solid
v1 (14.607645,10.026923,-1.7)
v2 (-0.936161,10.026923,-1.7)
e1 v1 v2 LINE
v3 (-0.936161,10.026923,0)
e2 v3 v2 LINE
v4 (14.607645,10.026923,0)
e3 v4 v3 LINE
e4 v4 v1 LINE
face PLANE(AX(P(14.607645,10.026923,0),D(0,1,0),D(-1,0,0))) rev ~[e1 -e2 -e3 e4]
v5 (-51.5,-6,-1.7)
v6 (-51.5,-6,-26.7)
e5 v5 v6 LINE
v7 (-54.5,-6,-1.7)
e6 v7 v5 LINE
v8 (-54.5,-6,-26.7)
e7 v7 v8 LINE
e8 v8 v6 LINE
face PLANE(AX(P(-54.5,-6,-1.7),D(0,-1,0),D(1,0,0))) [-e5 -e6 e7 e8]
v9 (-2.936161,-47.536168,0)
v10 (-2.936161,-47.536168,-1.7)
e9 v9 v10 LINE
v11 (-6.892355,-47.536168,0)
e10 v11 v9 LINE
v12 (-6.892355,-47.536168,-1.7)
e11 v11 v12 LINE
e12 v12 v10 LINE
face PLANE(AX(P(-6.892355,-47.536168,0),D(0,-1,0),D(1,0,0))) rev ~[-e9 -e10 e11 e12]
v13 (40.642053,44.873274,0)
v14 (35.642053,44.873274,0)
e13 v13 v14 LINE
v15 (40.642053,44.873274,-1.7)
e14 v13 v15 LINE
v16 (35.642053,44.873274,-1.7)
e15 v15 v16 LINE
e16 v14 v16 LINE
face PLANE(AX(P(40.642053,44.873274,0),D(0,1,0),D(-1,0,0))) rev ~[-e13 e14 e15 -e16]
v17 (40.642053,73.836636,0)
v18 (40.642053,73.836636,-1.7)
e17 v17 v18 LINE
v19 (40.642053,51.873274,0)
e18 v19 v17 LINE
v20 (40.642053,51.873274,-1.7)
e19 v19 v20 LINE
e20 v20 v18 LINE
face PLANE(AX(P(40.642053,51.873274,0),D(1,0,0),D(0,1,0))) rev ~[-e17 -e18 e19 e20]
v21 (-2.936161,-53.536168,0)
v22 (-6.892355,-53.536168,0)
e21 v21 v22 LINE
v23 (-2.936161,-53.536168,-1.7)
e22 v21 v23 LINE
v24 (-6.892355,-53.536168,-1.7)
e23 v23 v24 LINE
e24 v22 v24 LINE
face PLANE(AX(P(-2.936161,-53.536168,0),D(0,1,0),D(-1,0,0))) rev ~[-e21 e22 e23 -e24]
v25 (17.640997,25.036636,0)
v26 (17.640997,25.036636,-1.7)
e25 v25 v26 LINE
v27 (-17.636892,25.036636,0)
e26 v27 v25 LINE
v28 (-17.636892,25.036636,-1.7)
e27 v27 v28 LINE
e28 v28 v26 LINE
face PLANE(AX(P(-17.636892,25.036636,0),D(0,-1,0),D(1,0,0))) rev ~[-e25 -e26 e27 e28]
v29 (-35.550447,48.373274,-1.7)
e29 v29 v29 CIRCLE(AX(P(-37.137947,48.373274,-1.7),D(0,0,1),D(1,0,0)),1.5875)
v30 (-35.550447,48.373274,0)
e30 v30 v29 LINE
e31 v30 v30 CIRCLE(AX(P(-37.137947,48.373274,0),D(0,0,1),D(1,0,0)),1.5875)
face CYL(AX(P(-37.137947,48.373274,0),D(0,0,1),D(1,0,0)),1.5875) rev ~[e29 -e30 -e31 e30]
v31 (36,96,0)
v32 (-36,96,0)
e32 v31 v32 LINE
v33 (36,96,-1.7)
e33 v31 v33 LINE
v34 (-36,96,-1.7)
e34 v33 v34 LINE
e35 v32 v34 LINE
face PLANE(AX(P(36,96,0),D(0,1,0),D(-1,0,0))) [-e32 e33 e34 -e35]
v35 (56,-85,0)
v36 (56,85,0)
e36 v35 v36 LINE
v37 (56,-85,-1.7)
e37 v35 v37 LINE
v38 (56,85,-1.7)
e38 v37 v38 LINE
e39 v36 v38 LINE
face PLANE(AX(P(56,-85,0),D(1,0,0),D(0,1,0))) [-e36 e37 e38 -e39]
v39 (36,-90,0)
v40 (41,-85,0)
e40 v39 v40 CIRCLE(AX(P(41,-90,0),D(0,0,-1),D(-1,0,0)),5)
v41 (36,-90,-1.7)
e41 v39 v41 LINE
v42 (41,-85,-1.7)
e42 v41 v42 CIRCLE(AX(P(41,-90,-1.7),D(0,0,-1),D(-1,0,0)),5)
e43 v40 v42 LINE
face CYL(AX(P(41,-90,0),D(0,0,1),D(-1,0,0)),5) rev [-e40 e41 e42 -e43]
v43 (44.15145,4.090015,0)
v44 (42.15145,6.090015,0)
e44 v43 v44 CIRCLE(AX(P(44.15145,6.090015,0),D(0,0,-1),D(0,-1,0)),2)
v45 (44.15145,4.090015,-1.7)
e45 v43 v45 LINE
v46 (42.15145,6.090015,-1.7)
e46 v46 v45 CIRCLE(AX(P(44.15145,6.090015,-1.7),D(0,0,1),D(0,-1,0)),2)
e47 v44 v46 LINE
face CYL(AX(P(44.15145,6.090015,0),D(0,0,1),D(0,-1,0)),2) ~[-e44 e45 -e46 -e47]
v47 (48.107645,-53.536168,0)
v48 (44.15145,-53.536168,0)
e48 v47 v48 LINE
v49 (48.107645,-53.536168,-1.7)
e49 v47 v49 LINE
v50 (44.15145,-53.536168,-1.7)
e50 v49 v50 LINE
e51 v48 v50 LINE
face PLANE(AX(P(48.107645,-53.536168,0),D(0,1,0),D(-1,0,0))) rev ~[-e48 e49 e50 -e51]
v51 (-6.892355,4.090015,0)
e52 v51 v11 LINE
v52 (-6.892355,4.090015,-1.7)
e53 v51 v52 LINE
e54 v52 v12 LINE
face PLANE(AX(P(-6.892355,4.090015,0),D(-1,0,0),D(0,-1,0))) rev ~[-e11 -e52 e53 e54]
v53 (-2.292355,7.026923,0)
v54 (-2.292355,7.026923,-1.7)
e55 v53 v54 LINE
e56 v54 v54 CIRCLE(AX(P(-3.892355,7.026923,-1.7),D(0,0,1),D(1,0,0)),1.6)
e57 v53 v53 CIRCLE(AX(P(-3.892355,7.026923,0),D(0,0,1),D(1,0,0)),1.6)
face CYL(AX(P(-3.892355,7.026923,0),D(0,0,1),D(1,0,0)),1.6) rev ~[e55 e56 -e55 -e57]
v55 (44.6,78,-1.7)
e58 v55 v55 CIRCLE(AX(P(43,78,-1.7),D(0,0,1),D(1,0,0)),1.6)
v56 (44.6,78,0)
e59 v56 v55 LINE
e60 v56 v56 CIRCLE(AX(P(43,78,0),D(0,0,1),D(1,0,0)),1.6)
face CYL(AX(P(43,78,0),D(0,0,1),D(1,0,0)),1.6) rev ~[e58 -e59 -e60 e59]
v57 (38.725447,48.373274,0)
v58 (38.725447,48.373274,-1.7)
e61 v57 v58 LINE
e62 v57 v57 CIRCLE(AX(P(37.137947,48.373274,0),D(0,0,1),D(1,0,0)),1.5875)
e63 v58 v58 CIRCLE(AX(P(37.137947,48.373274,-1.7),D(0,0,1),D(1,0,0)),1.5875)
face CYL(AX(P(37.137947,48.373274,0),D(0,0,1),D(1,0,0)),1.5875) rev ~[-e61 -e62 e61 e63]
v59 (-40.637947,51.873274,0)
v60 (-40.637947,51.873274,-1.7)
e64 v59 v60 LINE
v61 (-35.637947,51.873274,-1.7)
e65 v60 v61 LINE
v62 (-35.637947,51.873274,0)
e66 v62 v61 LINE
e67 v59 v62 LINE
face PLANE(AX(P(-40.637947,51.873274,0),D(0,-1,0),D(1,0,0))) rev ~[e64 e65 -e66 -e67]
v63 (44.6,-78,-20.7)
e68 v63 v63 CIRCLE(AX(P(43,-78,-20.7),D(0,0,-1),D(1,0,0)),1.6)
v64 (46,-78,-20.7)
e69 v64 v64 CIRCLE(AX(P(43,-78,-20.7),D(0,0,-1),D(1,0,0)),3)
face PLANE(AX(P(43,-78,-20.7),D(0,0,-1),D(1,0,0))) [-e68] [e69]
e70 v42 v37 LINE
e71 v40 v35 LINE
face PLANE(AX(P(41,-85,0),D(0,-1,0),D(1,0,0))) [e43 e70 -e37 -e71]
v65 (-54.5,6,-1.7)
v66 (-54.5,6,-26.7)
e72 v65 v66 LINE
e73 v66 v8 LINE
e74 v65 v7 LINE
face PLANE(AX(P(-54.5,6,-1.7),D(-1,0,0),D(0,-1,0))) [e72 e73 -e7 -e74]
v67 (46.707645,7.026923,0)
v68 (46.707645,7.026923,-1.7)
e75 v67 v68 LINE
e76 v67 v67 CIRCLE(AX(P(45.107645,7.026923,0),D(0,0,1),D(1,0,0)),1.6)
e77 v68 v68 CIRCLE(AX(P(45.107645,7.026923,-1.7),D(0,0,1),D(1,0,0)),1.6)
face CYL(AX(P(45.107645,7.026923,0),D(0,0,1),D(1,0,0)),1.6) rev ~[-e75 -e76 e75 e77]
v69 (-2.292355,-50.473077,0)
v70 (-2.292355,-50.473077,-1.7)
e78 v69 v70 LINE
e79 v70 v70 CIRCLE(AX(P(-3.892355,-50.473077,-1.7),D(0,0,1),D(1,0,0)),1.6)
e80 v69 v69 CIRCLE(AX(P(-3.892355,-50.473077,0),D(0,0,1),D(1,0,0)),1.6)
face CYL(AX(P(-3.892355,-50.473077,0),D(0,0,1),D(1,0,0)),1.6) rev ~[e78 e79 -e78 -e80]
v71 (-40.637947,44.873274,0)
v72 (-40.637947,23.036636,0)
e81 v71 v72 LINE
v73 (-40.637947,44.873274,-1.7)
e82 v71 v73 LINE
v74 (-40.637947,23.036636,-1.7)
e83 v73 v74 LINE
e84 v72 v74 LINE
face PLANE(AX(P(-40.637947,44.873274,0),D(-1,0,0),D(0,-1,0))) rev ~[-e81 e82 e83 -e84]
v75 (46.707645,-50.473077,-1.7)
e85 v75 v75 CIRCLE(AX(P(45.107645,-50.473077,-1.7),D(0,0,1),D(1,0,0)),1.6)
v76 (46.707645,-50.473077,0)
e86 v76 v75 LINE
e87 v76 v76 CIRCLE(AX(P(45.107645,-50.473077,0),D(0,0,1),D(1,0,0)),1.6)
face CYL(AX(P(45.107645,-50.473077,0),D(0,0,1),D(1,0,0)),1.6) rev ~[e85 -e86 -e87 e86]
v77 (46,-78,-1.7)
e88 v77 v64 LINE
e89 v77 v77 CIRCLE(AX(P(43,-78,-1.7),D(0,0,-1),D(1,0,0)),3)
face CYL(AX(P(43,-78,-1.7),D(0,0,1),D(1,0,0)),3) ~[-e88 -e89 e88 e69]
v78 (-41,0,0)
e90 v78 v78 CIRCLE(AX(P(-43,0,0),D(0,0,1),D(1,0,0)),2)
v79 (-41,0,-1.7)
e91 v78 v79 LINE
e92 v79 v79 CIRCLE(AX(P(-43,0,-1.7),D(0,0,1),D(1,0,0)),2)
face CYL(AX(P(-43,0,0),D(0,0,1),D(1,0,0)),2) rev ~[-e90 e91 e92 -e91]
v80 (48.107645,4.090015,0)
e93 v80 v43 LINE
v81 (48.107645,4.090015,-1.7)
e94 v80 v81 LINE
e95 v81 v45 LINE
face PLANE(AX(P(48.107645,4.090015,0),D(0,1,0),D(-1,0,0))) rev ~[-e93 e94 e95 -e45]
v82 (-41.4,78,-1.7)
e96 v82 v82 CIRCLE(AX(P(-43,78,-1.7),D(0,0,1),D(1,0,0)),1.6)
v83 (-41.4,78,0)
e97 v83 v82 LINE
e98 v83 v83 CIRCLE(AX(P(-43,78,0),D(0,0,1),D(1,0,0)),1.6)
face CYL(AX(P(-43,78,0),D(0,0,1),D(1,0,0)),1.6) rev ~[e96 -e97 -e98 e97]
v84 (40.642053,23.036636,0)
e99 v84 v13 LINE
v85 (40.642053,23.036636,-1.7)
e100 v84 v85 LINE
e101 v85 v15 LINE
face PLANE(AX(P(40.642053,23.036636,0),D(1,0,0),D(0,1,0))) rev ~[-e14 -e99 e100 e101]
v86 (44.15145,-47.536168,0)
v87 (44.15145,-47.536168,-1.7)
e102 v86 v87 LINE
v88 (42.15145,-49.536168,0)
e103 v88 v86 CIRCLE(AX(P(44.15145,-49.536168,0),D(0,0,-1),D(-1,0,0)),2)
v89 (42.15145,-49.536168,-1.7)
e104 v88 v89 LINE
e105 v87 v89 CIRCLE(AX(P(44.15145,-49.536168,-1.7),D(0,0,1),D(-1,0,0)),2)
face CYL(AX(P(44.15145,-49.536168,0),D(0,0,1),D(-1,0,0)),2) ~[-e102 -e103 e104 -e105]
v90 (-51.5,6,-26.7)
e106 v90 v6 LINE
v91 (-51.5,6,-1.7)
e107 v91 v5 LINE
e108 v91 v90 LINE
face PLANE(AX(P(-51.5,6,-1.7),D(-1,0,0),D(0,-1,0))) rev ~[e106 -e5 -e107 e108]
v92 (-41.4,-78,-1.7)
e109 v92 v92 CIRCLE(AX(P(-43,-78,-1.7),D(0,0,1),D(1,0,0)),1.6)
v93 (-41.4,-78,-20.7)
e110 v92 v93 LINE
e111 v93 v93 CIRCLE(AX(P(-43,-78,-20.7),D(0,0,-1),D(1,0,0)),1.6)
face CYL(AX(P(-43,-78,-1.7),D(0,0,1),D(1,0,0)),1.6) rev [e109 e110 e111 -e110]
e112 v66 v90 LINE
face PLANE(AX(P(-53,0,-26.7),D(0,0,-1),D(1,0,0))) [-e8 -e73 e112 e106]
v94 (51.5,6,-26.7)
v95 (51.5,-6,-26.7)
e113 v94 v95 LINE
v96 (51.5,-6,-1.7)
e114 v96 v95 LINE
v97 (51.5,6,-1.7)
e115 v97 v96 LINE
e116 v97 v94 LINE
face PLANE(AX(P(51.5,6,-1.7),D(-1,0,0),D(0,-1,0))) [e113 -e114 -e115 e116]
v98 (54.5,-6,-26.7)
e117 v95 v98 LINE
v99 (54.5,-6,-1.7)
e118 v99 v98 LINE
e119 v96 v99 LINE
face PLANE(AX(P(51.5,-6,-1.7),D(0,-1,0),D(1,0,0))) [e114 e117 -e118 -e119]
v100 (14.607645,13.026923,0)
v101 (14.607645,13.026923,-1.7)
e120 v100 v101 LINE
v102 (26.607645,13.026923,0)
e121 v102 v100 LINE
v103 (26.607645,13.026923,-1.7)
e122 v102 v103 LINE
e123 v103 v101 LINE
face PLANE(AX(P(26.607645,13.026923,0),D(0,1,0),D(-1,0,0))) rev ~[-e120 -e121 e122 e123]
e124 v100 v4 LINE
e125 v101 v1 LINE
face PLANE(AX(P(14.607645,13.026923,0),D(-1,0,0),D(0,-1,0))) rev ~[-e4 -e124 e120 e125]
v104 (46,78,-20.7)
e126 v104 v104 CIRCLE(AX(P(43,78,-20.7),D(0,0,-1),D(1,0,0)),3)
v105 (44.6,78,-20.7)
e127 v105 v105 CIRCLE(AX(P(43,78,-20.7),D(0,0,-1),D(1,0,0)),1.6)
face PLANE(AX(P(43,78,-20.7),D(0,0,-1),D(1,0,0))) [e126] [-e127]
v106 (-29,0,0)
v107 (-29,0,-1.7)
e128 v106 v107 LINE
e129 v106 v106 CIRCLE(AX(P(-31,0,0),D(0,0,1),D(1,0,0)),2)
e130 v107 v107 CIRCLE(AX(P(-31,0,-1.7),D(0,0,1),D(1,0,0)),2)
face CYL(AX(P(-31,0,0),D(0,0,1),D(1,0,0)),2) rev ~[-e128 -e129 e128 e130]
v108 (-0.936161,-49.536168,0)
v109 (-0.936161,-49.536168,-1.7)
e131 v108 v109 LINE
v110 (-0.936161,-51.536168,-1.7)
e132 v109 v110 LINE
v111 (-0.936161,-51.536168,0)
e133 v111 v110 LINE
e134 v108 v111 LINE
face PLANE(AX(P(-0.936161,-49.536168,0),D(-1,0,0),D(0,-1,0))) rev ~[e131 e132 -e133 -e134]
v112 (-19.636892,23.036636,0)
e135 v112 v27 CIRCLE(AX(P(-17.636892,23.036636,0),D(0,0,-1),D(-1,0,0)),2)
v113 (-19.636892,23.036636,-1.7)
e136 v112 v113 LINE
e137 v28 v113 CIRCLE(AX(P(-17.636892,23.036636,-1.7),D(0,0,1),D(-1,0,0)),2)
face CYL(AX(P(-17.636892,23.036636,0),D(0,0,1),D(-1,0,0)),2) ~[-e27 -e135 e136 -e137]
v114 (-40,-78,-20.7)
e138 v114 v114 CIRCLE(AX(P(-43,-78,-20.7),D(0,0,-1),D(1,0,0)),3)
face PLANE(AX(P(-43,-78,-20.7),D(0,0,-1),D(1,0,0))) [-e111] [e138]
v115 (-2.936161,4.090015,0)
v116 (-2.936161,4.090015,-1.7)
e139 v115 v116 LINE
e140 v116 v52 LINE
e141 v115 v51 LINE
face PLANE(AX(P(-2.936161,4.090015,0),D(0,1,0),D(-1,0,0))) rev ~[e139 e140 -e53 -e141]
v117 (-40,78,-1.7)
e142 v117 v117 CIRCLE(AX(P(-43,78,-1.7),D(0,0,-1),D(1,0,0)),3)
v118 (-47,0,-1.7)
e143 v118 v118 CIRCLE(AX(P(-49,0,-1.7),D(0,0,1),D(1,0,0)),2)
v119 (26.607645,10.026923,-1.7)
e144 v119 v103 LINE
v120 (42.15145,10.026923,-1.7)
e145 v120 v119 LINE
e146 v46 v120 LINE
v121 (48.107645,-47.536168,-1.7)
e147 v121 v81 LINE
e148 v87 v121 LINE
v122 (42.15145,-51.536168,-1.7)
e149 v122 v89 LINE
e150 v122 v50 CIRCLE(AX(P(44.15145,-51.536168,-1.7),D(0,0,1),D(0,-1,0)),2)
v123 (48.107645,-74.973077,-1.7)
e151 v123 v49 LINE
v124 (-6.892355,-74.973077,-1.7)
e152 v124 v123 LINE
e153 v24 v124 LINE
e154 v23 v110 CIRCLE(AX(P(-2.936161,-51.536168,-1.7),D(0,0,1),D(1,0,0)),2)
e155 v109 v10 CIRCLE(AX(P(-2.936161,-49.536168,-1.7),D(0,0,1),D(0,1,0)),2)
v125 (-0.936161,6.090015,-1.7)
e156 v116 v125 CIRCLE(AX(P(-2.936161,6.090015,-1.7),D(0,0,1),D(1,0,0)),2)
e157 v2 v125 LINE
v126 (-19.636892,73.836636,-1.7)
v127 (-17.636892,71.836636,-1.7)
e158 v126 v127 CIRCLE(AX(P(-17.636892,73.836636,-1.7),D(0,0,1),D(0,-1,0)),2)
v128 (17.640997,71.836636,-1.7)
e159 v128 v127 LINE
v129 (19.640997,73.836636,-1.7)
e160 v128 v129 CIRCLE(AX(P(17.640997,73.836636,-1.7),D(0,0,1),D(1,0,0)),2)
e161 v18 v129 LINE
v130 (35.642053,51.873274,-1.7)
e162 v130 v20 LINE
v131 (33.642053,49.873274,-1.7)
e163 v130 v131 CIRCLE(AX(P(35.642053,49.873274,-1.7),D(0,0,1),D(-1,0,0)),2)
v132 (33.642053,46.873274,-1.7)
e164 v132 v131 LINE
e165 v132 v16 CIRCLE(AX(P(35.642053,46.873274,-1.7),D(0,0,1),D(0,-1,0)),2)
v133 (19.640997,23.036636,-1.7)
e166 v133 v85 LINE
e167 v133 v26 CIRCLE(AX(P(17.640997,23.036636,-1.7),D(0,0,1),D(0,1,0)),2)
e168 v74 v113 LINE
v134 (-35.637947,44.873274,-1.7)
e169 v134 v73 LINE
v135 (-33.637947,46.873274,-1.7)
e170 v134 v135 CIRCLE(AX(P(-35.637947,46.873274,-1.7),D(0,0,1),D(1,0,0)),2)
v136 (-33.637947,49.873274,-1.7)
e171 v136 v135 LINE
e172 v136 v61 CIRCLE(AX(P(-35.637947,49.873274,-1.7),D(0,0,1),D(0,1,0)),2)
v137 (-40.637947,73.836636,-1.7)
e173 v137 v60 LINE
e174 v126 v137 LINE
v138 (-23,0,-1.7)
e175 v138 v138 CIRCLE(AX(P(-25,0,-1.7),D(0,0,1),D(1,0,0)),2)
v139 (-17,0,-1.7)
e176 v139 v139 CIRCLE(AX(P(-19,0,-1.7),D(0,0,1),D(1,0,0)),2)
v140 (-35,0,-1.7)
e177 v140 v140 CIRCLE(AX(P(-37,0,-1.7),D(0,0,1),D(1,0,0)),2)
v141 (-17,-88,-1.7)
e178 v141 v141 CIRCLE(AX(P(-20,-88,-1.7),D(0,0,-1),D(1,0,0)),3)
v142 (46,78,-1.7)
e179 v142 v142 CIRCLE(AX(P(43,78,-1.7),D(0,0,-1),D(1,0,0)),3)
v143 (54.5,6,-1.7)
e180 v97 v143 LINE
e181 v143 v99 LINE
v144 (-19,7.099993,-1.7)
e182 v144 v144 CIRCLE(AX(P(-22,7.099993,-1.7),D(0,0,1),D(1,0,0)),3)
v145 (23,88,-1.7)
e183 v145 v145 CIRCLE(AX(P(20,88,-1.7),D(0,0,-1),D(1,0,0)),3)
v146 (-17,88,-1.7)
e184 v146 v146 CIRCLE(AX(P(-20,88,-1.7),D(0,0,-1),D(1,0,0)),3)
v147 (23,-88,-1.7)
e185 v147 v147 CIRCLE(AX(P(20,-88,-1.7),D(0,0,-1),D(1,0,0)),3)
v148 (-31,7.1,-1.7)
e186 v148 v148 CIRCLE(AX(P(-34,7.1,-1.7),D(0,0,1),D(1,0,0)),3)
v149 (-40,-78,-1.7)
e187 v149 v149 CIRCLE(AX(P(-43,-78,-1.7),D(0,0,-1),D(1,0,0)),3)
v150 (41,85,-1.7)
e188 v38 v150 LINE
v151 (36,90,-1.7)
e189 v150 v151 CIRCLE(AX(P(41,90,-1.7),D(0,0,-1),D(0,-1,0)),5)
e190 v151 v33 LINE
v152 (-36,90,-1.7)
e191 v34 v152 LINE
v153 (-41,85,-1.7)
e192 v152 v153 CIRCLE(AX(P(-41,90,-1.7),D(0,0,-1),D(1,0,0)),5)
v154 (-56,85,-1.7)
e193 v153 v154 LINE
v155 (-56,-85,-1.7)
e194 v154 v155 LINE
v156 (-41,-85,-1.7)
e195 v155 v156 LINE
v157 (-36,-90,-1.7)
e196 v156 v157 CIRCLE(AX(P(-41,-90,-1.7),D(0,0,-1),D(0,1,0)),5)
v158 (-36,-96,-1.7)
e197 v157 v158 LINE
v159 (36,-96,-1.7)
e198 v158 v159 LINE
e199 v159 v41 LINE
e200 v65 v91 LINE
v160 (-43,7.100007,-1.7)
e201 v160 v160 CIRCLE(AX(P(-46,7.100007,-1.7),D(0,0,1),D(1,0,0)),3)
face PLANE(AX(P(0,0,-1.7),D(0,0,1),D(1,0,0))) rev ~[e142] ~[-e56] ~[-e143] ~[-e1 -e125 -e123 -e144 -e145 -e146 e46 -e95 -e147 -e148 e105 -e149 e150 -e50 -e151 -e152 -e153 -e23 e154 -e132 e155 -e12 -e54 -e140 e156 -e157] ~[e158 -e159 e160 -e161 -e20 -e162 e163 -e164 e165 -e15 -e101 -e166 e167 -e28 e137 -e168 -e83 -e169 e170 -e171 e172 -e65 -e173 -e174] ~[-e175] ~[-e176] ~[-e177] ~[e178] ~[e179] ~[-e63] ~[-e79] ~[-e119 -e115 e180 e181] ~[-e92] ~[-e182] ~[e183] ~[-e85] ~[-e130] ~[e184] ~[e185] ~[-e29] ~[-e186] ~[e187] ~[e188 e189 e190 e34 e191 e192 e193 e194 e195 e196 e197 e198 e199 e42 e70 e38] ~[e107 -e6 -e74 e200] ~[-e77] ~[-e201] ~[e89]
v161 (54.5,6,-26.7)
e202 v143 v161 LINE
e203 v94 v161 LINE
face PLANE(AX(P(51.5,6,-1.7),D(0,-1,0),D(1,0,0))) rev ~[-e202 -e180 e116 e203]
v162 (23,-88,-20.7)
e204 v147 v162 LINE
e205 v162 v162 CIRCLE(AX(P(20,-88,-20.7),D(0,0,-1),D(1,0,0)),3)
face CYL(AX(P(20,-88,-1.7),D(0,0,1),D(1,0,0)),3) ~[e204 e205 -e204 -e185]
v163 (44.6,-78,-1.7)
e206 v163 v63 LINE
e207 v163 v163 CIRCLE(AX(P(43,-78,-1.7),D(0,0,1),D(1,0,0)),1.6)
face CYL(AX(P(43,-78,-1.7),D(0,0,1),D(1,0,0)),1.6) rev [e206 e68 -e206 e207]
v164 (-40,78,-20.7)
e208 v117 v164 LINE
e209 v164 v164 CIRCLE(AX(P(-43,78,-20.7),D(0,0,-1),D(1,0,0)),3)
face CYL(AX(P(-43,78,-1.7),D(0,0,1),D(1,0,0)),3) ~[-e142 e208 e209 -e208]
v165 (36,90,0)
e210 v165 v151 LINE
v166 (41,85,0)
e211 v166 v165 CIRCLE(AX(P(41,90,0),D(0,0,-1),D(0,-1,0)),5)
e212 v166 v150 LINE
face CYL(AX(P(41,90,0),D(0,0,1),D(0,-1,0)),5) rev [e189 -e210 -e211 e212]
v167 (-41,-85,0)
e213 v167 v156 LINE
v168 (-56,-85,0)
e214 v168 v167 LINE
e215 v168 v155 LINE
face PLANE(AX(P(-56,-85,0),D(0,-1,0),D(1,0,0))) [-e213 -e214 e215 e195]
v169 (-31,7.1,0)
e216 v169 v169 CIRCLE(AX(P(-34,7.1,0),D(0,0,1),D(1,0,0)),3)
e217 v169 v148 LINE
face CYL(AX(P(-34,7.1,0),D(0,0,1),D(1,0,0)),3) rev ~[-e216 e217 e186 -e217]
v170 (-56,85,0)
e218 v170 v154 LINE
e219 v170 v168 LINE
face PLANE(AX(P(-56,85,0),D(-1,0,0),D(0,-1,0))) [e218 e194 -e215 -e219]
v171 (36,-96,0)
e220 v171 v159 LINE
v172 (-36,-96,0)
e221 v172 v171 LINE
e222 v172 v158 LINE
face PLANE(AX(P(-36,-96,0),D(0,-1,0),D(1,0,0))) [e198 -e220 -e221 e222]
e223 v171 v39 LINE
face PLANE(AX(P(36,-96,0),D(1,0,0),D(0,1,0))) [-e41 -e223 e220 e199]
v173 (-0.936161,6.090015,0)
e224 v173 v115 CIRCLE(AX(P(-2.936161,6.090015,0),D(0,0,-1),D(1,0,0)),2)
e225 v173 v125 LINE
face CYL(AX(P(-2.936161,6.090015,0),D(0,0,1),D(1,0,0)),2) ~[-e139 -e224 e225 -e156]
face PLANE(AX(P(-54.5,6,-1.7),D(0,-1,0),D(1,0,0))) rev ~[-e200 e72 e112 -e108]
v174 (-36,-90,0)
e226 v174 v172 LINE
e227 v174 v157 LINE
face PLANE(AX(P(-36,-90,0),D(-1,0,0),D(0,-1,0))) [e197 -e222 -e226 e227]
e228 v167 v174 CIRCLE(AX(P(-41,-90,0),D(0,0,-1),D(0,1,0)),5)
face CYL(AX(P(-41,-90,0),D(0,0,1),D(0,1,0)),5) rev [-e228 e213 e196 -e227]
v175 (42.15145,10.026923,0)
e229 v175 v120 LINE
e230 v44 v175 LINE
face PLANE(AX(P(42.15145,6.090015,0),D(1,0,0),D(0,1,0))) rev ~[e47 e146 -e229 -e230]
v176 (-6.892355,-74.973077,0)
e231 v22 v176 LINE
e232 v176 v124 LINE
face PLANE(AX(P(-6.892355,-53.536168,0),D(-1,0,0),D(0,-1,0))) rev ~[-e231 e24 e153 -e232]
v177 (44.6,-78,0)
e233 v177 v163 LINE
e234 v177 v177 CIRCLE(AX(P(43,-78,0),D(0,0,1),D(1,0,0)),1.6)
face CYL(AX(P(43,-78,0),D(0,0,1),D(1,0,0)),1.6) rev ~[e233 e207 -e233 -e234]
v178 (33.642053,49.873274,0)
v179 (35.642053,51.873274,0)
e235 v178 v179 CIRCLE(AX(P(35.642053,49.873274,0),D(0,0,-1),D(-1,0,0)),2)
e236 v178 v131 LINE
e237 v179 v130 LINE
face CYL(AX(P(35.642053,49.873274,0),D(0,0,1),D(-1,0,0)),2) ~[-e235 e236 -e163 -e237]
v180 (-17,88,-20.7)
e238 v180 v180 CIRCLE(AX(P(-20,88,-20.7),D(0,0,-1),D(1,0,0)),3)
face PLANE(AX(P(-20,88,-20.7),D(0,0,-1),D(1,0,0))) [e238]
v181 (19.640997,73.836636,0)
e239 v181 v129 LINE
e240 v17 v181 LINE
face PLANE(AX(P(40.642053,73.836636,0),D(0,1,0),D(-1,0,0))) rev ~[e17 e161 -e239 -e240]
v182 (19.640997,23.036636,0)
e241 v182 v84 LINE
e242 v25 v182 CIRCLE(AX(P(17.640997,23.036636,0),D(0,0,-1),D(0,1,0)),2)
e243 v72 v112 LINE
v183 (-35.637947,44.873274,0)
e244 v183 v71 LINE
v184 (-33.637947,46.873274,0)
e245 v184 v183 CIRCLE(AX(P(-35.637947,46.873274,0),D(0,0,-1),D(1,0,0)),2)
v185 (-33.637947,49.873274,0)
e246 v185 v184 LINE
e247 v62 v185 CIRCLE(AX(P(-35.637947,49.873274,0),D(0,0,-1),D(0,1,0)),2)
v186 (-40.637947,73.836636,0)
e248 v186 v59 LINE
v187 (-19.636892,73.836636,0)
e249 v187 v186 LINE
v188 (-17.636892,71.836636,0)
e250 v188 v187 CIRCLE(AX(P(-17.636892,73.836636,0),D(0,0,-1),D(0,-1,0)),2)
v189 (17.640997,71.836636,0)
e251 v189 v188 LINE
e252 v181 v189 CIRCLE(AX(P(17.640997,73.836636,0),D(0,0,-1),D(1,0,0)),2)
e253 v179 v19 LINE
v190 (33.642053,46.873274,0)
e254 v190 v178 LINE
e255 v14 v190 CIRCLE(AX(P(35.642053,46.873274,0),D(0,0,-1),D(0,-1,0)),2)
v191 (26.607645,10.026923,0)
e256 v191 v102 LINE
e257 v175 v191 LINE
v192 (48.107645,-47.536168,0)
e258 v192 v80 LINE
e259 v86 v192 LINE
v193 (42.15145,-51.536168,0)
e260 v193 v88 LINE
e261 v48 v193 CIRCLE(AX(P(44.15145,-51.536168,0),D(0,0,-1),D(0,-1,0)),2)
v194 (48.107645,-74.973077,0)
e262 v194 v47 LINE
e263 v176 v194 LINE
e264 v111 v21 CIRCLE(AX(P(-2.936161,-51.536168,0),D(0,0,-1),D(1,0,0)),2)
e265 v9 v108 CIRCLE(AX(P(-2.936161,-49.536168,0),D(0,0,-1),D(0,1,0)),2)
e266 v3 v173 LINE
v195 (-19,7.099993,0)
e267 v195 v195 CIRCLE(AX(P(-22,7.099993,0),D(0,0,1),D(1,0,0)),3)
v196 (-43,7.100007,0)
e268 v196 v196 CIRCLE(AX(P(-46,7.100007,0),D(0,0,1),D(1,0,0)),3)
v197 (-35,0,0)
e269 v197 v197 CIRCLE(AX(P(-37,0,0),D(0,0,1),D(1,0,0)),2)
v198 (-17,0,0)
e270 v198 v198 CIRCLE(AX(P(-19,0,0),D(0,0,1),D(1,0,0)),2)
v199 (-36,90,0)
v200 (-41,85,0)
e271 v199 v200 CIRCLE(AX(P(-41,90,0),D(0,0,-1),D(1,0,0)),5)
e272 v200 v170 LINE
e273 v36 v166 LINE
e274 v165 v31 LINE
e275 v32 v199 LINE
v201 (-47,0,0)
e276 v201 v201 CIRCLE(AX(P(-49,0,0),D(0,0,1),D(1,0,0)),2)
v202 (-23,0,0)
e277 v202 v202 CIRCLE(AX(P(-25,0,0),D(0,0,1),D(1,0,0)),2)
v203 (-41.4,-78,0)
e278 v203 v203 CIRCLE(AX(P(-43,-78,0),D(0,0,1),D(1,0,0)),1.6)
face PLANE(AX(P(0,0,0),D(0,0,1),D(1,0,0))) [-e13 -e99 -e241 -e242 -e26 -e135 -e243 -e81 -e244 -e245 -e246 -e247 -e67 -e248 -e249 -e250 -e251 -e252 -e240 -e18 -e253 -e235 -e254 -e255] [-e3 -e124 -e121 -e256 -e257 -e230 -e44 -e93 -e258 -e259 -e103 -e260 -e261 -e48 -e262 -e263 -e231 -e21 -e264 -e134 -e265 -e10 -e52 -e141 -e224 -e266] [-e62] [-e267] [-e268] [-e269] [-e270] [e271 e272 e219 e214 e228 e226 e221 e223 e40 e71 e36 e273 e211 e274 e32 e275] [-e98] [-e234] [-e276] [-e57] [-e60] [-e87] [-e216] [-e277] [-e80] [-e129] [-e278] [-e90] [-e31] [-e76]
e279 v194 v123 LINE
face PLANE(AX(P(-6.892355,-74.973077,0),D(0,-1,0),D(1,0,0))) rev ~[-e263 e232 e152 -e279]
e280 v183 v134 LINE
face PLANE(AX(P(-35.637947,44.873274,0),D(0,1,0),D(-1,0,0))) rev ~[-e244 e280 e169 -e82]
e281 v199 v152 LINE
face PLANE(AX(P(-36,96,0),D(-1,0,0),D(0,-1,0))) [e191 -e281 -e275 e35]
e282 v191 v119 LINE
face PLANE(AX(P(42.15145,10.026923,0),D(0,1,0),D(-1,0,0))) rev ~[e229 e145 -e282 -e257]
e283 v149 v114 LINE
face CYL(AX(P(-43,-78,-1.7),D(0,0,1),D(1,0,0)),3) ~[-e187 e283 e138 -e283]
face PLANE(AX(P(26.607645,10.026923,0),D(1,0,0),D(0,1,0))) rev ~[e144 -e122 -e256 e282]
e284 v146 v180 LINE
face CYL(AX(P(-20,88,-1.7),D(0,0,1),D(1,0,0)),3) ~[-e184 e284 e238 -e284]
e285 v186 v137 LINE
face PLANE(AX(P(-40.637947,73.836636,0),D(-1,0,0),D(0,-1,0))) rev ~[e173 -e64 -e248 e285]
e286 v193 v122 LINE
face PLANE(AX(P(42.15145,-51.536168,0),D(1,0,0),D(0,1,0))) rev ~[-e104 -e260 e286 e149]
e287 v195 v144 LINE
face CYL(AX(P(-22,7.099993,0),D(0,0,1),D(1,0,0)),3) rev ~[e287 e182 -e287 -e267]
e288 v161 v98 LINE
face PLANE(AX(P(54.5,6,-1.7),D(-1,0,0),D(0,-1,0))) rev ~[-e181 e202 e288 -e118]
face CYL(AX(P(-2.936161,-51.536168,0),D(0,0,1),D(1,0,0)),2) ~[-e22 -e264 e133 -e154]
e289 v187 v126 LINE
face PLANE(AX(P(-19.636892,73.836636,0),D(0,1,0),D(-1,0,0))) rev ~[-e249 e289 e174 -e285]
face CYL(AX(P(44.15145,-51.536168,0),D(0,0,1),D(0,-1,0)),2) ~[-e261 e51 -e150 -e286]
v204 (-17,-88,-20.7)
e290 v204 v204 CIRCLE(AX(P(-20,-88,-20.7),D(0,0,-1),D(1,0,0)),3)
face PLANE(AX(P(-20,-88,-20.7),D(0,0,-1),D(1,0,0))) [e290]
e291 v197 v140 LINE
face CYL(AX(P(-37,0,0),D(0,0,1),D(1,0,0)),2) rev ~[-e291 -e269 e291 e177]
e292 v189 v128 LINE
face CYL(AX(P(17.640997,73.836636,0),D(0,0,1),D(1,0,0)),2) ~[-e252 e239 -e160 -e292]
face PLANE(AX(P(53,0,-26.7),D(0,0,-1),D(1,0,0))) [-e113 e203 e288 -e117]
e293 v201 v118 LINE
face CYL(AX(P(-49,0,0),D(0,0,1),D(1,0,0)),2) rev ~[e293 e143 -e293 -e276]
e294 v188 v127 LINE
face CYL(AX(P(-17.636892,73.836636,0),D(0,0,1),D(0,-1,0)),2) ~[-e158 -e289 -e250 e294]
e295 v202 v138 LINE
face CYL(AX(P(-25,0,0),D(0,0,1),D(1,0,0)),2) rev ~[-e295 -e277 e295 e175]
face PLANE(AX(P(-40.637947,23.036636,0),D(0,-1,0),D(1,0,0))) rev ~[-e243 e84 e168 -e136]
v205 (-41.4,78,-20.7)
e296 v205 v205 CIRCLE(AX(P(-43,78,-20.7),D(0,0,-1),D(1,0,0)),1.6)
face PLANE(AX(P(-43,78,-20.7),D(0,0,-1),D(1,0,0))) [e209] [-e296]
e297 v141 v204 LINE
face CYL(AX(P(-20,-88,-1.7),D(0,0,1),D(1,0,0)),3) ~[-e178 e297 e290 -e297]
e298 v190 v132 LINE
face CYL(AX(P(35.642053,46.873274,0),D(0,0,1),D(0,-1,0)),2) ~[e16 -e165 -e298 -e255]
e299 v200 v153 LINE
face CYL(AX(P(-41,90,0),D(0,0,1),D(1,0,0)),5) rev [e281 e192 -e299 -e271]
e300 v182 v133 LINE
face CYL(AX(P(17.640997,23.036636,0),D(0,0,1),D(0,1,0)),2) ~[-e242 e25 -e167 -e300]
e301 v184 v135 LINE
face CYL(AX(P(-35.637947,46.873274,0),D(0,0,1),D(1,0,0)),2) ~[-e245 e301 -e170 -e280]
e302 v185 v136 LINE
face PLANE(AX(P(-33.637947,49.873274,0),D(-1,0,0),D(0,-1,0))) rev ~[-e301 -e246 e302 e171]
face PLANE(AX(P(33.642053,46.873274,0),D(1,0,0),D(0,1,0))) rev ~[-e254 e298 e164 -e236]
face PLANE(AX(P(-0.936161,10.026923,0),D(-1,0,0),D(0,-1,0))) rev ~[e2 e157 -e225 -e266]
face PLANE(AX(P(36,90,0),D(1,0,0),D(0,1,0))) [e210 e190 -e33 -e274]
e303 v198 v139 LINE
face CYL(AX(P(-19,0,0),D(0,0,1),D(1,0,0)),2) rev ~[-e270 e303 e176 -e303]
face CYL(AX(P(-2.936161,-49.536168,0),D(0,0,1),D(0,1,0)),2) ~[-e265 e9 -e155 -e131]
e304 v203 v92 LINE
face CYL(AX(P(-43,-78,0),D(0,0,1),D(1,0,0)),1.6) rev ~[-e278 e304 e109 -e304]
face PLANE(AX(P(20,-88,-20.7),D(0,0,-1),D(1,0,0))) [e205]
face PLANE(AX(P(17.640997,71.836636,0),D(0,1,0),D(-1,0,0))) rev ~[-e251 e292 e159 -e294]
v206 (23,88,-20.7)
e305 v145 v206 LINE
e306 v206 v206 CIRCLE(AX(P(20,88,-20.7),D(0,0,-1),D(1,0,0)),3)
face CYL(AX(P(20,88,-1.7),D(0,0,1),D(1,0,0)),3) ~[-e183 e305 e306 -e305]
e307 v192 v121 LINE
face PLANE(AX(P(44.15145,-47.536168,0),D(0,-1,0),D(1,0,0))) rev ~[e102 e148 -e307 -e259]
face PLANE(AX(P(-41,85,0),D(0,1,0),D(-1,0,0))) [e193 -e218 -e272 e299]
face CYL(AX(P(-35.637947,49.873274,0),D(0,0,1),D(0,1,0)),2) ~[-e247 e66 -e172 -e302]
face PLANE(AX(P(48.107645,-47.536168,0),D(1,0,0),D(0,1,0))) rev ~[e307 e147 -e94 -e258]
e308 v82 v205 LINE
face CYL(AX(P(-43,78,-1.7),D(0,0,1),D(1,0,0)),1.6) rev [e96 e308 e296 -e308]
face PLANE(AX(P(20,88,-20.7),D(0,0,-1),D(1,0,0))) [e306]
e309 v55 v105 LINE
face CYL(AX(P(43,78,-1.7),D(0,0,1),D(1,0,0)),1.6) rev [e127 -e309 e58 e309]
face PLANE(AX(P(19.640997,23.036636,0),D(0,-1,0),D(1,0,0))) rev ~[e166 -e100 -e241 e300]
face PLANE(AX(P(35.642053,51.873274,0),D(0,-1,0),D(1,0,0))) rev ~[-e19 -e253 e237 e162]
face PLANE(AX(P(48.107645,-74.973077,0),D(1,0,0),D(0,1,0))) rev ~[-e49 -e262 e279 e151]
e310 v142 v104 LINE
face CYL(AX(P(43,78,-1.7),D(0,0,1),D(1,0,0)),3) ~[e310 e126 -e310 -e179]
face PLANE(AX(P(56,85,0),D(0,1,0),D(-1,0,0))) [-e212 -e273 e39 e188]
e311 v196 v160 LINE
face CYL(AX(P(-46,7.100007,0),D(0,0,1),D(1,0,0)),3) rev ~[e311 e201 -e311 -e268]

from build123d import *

# Parameters (mm, degrees)
F0_R     = 1.6
F0_R_2   = 2
F0_R_3   = 3
F2_DEPTH = 1.7
F3_R     = 1.6
F4_DEPTH = 1.701
F5_R     = 3
F5_R_2   = 1.6
F6_DEPTH = 19
F1_R     = 1.5875
F7_DEPTH = 20.701
F5_W     = 3
F5_H     = 12
F8_DEPTH = 25


# Not quite as in the source:
# - a feature names something its author has since deleted; it is built from what else it names


with BuildPart() as f2:
    # F0 (on Top) → F2 (new body)
    with BuildSketch(Plane.XY):
        with BuildLine():
            Line((36, 90), (36, 96))
            Line((36, 96), (-36, 96))
            Line((-36, 96), (-36, 90))
            ThreePointArc((-36, 90), (-37.4644660941, 86.4644660941), (-41, 85))
            Line((-41, 85), (-56, 85))
            Line((-56, 85), (-56, -85))
            Line((-56, -85), (-41, -85))
            ThreePointArc((-41, -85), (-37.4644660941, -86.4644660941), (-36, -90))
            Line((-36, -90), (-36, -96))
            Line((-36, -96), (36, -96))
            Line((36, -96), (36, -90))
            ThreePointArc((36, -90), (37.4644660941, -86.4644660941), (41, -85))
            Line((41, -85), (56, -85))
            Line((56, -85), (56, 85))
            Line((56, 85), (41, 85))
            ThreePointArc((41, 85), (37.4644660941, 86.4644660941), (36, 90))
        make_face()
        with Locations((-43, -78)):
            Circle(F0_R, mode=Mode.SUBTRACT)
        with Locations((43, -78)):
            Circle(F0_R, mode=Mode.SUBTRACT)
        with Locations((-49, 0)):
            Circle(F0_R_2, mode=Mode.SUBTRACT)
        with Locations((-43, 0)):
            Circle(F0_R_2, mode=Mode.SUBTRACT)
        with Locations((-46, 7.1000065655)):
            Circle(F0_R_3, mode=Mode.SUBTRACT)
        with Locations((-37, 0)):
            Circle(F0_R_2, mode=Mode.SUBTRACT)
        with Locations((-31, 0)):
            Circle(F0_R_2, mode=Mode.SUBTRACT)
        with Locations((-34, 7.0999998483)):
            Circle(F0_R_3, mode=Mode.SUBTRACT)
        with Locations((-25, 0)):
            Circle(F0_R_2, mode=Mode.SUBTRACT)
        with Locations((-22, 7.0999931312)):
            Circle(F0_R_3, mode=Mode.SUBTRACT)
        with Locations((-19, 0)):
            Circle(F0_R_2, mode=Mode.SUBTRACT)
        with Locations((-43, 78)):
            Circle(F0_R, mode=Mode.SUBTRACT)
        with Locations((43, 78)):
            Circle(F0_R, mode=Mode.SUBTRACT)
    extrude(amount=-F2_DEPTH)

    # F3 (on face) → F4 (cut, through all)
    with BuildSketch(Plane.XY):
        with BuildLine():
            Line((-6.8923553079, -74.973076582), (48.1076446921, -74.973076582))
            Line((48.1076446921, -74.973076582), (48.1076446921, -53.5361680277))
            Line((48.1076446921, -53.5361680277), (44.1514502317, -53.5361680277))
            ThreePointArc((44.1514502317, -53.5361680277), (42.7372366693, -52.95038159), (42.1514502317, -51.5361680277))
            Line((42.1514502317, -51.5361680277), (42.1514502317, -49.5361680277))
            ThreePointArc((42.1514502317, -49.5361680277), (42.7372366693, -48.1219544653), (44.1514502317, -47.5361680277))
            Line((44.1514502317, -47.5361680277), (48.1076446921, -47.5361680277))
            Line((48.1076446921, -47.5361680277), (48.1076446921, 4.0900148638))
            Line((48.1076446921, 4.0900148638), (44.1514502317, 4.0900148638))
            ThreePointArc((44.1514502317, 4.0900148638), (42.7372366693, 4.6758013014), (42.1514502317, 6.0900148638))
            Line((42.1514502317, 6.0900148638), (42.1514502317, 10.026923418))
            Line((42.1514502317, 10.026923418), (26.6076446921, 10.026923418))
            Line((26.6076446921, 10.026923418), (26.6076446921, 13.026923418))
            Line((26.6076446921, 13.026923418), (14.6076446921, 13.026923418))
            Line((14.6076446921, 13.026923418), (14.6076446921, 10.026923418))
            Line((14.6076446921, 10.026923418), (-0.9361608475, 10.026923418))
            Line((-0.9361608475, 10.026923418), (-0.9361608475, 6.0900148638))
            ThreePointArc((-0.9361608475, 6.0900148638), (-1.5219472852, 4.6758013014), (-2.9361608475, 4.0900148638))
            Line((-2.9361608475, 4.0900148638), (-6.8923553079, 4.0900148638))
            Line((-6.8923553079, 4.0900148638), (-6.8923553079, -47.5361680277))
            Line((-6.8923553079, -47.5361680277), (-2.9361608475, -47.5361680277))
            ThreePointArc((-2.9361608475, -47.5361680277), (-1.5219472852, -48.1219544653), (-0.9361608475, -49.5361680277))
            Line((-0.9361608475, -49.5361680277), (-0.9361608475, -51.5361680277))
            ThreePointArc((-0.9361608475, -51.5361680277), (-1.5219472852, -52.95038159), (-2.9361608475, -53.5361680277))
            Line((-2.9361608475, -53.5361680277), (-6.8923553079, -53.5361680277))
            Line((-6.8923553079, -53.5361680277), (-6.8923553079, -74.973076582))
        make_face()
        with Locations((-3.8923553079, -50.473076582)):
            Circle(F3_R)
        with Locations((45.1076446921, -50.473076582)):
            Circle(F3_R)
        with Locations((-3.8923553079, 7.026923418)):
            Circle(F3_R)
        with Locations((45.1076446921, 7.026923418)):
            Circle(F3_R)
    extrude(amount=-F4_DEPTH, mode=Mode.SUBTRACT)

    # F5 (on face) → F6 (join)
    with BuildSketch(Plane(origin=(0, 0, -1.7), x_dir=(1, 0, 0), z_dir=(0, 0, -1))):
        with Locations((-20, 88)):
            Circle(F5_R)
        with Locations((20, 88)):
            Circle(F5_R)
        with Locations((-20, -88)):
            Circle(F5_R)
        with Locations((20, -88)):
            Circle(F5_R)
        with Locations((-43, 78)):
            Circle(F5_R)
        with Locations((-43, 78)):
            Circle(F5_R_2, mode=Mode.SUBTRACT)
        with Locations((43, 78)):
            Circle(F5_R)
        with Locations((43, 78)):
            Circle(F5_R_2, mode=Mode.SUBTRACT)
        with Locations((43, -78)):
            Circle(F5_R)
        with Locations((43, -78)):
            Circle(F5_R_2, mode=Mode.SUBTRACT)
        with Locations((-43, -78)):
            Circle(F5_R)
        with Locations((-43, -78)):
            Circle(F5_R_2, mode=Mode.SUBTRACT)
    extrude(amount=F6_DEPTH)

    # F1 (on face) → F7 (cut, through all)
    with BuildSketch(Plane.XY):
        with BuildLine():
            Line((-40.6379473025, 44.8732740056), (-40.6379473025, 23.0366364121))
            Line((-40.6379473025, 23.0366364121), (-19.6368917197, 23.0366364121))
            ThreePointArc((-19.6368917197, 23.0366364121), (-19.0511052821, 24.4508499745), (-17.6368917197, 25.0366364121))
            Line((-17.6368917197, 25.0366364121), (17.6409971148, 25.0366364121))
            ThreePointArc((17.6409971148, 25.0366364121), (19.0552106772, 24.4508499745), (19.6409971148, 23.0366364121))
            Line((19.6409971148, 23.0366364121), (40.6420526975, 23.0366364121))
            Line((40.6420526975, 23.0366364121), (40.6420526975, 44.8732740056))
            Line((40.6420526975, 44.8732740056), (35.6420526975, 44.8732740056))
            ThreePointArc((35.6420526975, 44.8732740056), (34.2278391352, 45.4590604432), (33.6420526975, 46.8732740056))
            Line((33.6420526975, 46.8732740056), (33.6420526975, 49.8732740056))
            ThreePointArc((33.6420526975, 49.8732740056), (34.2278391352, 51.287487568), (35.6420526975, 51.8732740056))
            Line((35.6420526975, 51.8732740056), (40.6420526975, 51.8732740056))
            Line((40.6420526975, 51.8732740056), (40.6420526975, 73.8366364121))
            Line((40.6420526975, 73.8366364121), (19.6409971148, 73.8366364121))
            ThreePointArc((19.6409971148, 73.8366364121), (19.0552106772, 72.4224228498), (17.6409971148, 71.8366364121))
            Line((17.6409971148, 71.8366364121), (-17.6368917197, 71.8366364121))
            ThreePointArc((-17.6368917197, 71.8366364121), (-19.0511052821, 72.4224228498), (-19.6368917197, 73.8366364121))
            Line((-19.6368917197, 73.8366364121), (-40.6379473025, 73.8366364121))
            Line((-40.6379473025, 73.8366364121), (-40.6379473025, 51.8732740056))
            Line((-40.6379473025, 51.8732740056), (-35.6379473025, 51.8732740056))
            ThreePointArc((-35.6379473025, 51.8732740056), (-34.2237337401, 51.287487568), (-33.6379473025, 49.8732740056))
            Line((-33.6379473025, 49.8732740056), (-33.6379473025, 46.8732740056))
            ThreePointArc((-33.6379473025, 46.8732740056), (-34.2237337401, 45.4590604432), (-35.6379473025, 44.8732740056))
            Line((-35.6379473025, 44.8732740056), (-40.6379473025, 44.8732740056))
        make_face()
        with Locations((-37.1379473025, 48.3732740056)):
            Circle(F1_R)
        with Locations((37.1379473025, 48.3732740056)):
            Circle(F1_R)
    extrude(amount=-F7_DEPTH, mode=Mode.SUBTRACT)

    # F5 (on face) → F8 (join)
    with BuildSketch(Plane(origin=(0, 0, -1.7), x_dir=(1, 0, 0), z_dir=(0, 0, -1))):
        with Locations((53, 0)):
            Rectangle(F5_W, F5_H)
        with Locations((-53, 0)):
            Rectangle(F5_W, F5_H)
    extrude(amount=F8_DEPTH)


solid = f2.part
